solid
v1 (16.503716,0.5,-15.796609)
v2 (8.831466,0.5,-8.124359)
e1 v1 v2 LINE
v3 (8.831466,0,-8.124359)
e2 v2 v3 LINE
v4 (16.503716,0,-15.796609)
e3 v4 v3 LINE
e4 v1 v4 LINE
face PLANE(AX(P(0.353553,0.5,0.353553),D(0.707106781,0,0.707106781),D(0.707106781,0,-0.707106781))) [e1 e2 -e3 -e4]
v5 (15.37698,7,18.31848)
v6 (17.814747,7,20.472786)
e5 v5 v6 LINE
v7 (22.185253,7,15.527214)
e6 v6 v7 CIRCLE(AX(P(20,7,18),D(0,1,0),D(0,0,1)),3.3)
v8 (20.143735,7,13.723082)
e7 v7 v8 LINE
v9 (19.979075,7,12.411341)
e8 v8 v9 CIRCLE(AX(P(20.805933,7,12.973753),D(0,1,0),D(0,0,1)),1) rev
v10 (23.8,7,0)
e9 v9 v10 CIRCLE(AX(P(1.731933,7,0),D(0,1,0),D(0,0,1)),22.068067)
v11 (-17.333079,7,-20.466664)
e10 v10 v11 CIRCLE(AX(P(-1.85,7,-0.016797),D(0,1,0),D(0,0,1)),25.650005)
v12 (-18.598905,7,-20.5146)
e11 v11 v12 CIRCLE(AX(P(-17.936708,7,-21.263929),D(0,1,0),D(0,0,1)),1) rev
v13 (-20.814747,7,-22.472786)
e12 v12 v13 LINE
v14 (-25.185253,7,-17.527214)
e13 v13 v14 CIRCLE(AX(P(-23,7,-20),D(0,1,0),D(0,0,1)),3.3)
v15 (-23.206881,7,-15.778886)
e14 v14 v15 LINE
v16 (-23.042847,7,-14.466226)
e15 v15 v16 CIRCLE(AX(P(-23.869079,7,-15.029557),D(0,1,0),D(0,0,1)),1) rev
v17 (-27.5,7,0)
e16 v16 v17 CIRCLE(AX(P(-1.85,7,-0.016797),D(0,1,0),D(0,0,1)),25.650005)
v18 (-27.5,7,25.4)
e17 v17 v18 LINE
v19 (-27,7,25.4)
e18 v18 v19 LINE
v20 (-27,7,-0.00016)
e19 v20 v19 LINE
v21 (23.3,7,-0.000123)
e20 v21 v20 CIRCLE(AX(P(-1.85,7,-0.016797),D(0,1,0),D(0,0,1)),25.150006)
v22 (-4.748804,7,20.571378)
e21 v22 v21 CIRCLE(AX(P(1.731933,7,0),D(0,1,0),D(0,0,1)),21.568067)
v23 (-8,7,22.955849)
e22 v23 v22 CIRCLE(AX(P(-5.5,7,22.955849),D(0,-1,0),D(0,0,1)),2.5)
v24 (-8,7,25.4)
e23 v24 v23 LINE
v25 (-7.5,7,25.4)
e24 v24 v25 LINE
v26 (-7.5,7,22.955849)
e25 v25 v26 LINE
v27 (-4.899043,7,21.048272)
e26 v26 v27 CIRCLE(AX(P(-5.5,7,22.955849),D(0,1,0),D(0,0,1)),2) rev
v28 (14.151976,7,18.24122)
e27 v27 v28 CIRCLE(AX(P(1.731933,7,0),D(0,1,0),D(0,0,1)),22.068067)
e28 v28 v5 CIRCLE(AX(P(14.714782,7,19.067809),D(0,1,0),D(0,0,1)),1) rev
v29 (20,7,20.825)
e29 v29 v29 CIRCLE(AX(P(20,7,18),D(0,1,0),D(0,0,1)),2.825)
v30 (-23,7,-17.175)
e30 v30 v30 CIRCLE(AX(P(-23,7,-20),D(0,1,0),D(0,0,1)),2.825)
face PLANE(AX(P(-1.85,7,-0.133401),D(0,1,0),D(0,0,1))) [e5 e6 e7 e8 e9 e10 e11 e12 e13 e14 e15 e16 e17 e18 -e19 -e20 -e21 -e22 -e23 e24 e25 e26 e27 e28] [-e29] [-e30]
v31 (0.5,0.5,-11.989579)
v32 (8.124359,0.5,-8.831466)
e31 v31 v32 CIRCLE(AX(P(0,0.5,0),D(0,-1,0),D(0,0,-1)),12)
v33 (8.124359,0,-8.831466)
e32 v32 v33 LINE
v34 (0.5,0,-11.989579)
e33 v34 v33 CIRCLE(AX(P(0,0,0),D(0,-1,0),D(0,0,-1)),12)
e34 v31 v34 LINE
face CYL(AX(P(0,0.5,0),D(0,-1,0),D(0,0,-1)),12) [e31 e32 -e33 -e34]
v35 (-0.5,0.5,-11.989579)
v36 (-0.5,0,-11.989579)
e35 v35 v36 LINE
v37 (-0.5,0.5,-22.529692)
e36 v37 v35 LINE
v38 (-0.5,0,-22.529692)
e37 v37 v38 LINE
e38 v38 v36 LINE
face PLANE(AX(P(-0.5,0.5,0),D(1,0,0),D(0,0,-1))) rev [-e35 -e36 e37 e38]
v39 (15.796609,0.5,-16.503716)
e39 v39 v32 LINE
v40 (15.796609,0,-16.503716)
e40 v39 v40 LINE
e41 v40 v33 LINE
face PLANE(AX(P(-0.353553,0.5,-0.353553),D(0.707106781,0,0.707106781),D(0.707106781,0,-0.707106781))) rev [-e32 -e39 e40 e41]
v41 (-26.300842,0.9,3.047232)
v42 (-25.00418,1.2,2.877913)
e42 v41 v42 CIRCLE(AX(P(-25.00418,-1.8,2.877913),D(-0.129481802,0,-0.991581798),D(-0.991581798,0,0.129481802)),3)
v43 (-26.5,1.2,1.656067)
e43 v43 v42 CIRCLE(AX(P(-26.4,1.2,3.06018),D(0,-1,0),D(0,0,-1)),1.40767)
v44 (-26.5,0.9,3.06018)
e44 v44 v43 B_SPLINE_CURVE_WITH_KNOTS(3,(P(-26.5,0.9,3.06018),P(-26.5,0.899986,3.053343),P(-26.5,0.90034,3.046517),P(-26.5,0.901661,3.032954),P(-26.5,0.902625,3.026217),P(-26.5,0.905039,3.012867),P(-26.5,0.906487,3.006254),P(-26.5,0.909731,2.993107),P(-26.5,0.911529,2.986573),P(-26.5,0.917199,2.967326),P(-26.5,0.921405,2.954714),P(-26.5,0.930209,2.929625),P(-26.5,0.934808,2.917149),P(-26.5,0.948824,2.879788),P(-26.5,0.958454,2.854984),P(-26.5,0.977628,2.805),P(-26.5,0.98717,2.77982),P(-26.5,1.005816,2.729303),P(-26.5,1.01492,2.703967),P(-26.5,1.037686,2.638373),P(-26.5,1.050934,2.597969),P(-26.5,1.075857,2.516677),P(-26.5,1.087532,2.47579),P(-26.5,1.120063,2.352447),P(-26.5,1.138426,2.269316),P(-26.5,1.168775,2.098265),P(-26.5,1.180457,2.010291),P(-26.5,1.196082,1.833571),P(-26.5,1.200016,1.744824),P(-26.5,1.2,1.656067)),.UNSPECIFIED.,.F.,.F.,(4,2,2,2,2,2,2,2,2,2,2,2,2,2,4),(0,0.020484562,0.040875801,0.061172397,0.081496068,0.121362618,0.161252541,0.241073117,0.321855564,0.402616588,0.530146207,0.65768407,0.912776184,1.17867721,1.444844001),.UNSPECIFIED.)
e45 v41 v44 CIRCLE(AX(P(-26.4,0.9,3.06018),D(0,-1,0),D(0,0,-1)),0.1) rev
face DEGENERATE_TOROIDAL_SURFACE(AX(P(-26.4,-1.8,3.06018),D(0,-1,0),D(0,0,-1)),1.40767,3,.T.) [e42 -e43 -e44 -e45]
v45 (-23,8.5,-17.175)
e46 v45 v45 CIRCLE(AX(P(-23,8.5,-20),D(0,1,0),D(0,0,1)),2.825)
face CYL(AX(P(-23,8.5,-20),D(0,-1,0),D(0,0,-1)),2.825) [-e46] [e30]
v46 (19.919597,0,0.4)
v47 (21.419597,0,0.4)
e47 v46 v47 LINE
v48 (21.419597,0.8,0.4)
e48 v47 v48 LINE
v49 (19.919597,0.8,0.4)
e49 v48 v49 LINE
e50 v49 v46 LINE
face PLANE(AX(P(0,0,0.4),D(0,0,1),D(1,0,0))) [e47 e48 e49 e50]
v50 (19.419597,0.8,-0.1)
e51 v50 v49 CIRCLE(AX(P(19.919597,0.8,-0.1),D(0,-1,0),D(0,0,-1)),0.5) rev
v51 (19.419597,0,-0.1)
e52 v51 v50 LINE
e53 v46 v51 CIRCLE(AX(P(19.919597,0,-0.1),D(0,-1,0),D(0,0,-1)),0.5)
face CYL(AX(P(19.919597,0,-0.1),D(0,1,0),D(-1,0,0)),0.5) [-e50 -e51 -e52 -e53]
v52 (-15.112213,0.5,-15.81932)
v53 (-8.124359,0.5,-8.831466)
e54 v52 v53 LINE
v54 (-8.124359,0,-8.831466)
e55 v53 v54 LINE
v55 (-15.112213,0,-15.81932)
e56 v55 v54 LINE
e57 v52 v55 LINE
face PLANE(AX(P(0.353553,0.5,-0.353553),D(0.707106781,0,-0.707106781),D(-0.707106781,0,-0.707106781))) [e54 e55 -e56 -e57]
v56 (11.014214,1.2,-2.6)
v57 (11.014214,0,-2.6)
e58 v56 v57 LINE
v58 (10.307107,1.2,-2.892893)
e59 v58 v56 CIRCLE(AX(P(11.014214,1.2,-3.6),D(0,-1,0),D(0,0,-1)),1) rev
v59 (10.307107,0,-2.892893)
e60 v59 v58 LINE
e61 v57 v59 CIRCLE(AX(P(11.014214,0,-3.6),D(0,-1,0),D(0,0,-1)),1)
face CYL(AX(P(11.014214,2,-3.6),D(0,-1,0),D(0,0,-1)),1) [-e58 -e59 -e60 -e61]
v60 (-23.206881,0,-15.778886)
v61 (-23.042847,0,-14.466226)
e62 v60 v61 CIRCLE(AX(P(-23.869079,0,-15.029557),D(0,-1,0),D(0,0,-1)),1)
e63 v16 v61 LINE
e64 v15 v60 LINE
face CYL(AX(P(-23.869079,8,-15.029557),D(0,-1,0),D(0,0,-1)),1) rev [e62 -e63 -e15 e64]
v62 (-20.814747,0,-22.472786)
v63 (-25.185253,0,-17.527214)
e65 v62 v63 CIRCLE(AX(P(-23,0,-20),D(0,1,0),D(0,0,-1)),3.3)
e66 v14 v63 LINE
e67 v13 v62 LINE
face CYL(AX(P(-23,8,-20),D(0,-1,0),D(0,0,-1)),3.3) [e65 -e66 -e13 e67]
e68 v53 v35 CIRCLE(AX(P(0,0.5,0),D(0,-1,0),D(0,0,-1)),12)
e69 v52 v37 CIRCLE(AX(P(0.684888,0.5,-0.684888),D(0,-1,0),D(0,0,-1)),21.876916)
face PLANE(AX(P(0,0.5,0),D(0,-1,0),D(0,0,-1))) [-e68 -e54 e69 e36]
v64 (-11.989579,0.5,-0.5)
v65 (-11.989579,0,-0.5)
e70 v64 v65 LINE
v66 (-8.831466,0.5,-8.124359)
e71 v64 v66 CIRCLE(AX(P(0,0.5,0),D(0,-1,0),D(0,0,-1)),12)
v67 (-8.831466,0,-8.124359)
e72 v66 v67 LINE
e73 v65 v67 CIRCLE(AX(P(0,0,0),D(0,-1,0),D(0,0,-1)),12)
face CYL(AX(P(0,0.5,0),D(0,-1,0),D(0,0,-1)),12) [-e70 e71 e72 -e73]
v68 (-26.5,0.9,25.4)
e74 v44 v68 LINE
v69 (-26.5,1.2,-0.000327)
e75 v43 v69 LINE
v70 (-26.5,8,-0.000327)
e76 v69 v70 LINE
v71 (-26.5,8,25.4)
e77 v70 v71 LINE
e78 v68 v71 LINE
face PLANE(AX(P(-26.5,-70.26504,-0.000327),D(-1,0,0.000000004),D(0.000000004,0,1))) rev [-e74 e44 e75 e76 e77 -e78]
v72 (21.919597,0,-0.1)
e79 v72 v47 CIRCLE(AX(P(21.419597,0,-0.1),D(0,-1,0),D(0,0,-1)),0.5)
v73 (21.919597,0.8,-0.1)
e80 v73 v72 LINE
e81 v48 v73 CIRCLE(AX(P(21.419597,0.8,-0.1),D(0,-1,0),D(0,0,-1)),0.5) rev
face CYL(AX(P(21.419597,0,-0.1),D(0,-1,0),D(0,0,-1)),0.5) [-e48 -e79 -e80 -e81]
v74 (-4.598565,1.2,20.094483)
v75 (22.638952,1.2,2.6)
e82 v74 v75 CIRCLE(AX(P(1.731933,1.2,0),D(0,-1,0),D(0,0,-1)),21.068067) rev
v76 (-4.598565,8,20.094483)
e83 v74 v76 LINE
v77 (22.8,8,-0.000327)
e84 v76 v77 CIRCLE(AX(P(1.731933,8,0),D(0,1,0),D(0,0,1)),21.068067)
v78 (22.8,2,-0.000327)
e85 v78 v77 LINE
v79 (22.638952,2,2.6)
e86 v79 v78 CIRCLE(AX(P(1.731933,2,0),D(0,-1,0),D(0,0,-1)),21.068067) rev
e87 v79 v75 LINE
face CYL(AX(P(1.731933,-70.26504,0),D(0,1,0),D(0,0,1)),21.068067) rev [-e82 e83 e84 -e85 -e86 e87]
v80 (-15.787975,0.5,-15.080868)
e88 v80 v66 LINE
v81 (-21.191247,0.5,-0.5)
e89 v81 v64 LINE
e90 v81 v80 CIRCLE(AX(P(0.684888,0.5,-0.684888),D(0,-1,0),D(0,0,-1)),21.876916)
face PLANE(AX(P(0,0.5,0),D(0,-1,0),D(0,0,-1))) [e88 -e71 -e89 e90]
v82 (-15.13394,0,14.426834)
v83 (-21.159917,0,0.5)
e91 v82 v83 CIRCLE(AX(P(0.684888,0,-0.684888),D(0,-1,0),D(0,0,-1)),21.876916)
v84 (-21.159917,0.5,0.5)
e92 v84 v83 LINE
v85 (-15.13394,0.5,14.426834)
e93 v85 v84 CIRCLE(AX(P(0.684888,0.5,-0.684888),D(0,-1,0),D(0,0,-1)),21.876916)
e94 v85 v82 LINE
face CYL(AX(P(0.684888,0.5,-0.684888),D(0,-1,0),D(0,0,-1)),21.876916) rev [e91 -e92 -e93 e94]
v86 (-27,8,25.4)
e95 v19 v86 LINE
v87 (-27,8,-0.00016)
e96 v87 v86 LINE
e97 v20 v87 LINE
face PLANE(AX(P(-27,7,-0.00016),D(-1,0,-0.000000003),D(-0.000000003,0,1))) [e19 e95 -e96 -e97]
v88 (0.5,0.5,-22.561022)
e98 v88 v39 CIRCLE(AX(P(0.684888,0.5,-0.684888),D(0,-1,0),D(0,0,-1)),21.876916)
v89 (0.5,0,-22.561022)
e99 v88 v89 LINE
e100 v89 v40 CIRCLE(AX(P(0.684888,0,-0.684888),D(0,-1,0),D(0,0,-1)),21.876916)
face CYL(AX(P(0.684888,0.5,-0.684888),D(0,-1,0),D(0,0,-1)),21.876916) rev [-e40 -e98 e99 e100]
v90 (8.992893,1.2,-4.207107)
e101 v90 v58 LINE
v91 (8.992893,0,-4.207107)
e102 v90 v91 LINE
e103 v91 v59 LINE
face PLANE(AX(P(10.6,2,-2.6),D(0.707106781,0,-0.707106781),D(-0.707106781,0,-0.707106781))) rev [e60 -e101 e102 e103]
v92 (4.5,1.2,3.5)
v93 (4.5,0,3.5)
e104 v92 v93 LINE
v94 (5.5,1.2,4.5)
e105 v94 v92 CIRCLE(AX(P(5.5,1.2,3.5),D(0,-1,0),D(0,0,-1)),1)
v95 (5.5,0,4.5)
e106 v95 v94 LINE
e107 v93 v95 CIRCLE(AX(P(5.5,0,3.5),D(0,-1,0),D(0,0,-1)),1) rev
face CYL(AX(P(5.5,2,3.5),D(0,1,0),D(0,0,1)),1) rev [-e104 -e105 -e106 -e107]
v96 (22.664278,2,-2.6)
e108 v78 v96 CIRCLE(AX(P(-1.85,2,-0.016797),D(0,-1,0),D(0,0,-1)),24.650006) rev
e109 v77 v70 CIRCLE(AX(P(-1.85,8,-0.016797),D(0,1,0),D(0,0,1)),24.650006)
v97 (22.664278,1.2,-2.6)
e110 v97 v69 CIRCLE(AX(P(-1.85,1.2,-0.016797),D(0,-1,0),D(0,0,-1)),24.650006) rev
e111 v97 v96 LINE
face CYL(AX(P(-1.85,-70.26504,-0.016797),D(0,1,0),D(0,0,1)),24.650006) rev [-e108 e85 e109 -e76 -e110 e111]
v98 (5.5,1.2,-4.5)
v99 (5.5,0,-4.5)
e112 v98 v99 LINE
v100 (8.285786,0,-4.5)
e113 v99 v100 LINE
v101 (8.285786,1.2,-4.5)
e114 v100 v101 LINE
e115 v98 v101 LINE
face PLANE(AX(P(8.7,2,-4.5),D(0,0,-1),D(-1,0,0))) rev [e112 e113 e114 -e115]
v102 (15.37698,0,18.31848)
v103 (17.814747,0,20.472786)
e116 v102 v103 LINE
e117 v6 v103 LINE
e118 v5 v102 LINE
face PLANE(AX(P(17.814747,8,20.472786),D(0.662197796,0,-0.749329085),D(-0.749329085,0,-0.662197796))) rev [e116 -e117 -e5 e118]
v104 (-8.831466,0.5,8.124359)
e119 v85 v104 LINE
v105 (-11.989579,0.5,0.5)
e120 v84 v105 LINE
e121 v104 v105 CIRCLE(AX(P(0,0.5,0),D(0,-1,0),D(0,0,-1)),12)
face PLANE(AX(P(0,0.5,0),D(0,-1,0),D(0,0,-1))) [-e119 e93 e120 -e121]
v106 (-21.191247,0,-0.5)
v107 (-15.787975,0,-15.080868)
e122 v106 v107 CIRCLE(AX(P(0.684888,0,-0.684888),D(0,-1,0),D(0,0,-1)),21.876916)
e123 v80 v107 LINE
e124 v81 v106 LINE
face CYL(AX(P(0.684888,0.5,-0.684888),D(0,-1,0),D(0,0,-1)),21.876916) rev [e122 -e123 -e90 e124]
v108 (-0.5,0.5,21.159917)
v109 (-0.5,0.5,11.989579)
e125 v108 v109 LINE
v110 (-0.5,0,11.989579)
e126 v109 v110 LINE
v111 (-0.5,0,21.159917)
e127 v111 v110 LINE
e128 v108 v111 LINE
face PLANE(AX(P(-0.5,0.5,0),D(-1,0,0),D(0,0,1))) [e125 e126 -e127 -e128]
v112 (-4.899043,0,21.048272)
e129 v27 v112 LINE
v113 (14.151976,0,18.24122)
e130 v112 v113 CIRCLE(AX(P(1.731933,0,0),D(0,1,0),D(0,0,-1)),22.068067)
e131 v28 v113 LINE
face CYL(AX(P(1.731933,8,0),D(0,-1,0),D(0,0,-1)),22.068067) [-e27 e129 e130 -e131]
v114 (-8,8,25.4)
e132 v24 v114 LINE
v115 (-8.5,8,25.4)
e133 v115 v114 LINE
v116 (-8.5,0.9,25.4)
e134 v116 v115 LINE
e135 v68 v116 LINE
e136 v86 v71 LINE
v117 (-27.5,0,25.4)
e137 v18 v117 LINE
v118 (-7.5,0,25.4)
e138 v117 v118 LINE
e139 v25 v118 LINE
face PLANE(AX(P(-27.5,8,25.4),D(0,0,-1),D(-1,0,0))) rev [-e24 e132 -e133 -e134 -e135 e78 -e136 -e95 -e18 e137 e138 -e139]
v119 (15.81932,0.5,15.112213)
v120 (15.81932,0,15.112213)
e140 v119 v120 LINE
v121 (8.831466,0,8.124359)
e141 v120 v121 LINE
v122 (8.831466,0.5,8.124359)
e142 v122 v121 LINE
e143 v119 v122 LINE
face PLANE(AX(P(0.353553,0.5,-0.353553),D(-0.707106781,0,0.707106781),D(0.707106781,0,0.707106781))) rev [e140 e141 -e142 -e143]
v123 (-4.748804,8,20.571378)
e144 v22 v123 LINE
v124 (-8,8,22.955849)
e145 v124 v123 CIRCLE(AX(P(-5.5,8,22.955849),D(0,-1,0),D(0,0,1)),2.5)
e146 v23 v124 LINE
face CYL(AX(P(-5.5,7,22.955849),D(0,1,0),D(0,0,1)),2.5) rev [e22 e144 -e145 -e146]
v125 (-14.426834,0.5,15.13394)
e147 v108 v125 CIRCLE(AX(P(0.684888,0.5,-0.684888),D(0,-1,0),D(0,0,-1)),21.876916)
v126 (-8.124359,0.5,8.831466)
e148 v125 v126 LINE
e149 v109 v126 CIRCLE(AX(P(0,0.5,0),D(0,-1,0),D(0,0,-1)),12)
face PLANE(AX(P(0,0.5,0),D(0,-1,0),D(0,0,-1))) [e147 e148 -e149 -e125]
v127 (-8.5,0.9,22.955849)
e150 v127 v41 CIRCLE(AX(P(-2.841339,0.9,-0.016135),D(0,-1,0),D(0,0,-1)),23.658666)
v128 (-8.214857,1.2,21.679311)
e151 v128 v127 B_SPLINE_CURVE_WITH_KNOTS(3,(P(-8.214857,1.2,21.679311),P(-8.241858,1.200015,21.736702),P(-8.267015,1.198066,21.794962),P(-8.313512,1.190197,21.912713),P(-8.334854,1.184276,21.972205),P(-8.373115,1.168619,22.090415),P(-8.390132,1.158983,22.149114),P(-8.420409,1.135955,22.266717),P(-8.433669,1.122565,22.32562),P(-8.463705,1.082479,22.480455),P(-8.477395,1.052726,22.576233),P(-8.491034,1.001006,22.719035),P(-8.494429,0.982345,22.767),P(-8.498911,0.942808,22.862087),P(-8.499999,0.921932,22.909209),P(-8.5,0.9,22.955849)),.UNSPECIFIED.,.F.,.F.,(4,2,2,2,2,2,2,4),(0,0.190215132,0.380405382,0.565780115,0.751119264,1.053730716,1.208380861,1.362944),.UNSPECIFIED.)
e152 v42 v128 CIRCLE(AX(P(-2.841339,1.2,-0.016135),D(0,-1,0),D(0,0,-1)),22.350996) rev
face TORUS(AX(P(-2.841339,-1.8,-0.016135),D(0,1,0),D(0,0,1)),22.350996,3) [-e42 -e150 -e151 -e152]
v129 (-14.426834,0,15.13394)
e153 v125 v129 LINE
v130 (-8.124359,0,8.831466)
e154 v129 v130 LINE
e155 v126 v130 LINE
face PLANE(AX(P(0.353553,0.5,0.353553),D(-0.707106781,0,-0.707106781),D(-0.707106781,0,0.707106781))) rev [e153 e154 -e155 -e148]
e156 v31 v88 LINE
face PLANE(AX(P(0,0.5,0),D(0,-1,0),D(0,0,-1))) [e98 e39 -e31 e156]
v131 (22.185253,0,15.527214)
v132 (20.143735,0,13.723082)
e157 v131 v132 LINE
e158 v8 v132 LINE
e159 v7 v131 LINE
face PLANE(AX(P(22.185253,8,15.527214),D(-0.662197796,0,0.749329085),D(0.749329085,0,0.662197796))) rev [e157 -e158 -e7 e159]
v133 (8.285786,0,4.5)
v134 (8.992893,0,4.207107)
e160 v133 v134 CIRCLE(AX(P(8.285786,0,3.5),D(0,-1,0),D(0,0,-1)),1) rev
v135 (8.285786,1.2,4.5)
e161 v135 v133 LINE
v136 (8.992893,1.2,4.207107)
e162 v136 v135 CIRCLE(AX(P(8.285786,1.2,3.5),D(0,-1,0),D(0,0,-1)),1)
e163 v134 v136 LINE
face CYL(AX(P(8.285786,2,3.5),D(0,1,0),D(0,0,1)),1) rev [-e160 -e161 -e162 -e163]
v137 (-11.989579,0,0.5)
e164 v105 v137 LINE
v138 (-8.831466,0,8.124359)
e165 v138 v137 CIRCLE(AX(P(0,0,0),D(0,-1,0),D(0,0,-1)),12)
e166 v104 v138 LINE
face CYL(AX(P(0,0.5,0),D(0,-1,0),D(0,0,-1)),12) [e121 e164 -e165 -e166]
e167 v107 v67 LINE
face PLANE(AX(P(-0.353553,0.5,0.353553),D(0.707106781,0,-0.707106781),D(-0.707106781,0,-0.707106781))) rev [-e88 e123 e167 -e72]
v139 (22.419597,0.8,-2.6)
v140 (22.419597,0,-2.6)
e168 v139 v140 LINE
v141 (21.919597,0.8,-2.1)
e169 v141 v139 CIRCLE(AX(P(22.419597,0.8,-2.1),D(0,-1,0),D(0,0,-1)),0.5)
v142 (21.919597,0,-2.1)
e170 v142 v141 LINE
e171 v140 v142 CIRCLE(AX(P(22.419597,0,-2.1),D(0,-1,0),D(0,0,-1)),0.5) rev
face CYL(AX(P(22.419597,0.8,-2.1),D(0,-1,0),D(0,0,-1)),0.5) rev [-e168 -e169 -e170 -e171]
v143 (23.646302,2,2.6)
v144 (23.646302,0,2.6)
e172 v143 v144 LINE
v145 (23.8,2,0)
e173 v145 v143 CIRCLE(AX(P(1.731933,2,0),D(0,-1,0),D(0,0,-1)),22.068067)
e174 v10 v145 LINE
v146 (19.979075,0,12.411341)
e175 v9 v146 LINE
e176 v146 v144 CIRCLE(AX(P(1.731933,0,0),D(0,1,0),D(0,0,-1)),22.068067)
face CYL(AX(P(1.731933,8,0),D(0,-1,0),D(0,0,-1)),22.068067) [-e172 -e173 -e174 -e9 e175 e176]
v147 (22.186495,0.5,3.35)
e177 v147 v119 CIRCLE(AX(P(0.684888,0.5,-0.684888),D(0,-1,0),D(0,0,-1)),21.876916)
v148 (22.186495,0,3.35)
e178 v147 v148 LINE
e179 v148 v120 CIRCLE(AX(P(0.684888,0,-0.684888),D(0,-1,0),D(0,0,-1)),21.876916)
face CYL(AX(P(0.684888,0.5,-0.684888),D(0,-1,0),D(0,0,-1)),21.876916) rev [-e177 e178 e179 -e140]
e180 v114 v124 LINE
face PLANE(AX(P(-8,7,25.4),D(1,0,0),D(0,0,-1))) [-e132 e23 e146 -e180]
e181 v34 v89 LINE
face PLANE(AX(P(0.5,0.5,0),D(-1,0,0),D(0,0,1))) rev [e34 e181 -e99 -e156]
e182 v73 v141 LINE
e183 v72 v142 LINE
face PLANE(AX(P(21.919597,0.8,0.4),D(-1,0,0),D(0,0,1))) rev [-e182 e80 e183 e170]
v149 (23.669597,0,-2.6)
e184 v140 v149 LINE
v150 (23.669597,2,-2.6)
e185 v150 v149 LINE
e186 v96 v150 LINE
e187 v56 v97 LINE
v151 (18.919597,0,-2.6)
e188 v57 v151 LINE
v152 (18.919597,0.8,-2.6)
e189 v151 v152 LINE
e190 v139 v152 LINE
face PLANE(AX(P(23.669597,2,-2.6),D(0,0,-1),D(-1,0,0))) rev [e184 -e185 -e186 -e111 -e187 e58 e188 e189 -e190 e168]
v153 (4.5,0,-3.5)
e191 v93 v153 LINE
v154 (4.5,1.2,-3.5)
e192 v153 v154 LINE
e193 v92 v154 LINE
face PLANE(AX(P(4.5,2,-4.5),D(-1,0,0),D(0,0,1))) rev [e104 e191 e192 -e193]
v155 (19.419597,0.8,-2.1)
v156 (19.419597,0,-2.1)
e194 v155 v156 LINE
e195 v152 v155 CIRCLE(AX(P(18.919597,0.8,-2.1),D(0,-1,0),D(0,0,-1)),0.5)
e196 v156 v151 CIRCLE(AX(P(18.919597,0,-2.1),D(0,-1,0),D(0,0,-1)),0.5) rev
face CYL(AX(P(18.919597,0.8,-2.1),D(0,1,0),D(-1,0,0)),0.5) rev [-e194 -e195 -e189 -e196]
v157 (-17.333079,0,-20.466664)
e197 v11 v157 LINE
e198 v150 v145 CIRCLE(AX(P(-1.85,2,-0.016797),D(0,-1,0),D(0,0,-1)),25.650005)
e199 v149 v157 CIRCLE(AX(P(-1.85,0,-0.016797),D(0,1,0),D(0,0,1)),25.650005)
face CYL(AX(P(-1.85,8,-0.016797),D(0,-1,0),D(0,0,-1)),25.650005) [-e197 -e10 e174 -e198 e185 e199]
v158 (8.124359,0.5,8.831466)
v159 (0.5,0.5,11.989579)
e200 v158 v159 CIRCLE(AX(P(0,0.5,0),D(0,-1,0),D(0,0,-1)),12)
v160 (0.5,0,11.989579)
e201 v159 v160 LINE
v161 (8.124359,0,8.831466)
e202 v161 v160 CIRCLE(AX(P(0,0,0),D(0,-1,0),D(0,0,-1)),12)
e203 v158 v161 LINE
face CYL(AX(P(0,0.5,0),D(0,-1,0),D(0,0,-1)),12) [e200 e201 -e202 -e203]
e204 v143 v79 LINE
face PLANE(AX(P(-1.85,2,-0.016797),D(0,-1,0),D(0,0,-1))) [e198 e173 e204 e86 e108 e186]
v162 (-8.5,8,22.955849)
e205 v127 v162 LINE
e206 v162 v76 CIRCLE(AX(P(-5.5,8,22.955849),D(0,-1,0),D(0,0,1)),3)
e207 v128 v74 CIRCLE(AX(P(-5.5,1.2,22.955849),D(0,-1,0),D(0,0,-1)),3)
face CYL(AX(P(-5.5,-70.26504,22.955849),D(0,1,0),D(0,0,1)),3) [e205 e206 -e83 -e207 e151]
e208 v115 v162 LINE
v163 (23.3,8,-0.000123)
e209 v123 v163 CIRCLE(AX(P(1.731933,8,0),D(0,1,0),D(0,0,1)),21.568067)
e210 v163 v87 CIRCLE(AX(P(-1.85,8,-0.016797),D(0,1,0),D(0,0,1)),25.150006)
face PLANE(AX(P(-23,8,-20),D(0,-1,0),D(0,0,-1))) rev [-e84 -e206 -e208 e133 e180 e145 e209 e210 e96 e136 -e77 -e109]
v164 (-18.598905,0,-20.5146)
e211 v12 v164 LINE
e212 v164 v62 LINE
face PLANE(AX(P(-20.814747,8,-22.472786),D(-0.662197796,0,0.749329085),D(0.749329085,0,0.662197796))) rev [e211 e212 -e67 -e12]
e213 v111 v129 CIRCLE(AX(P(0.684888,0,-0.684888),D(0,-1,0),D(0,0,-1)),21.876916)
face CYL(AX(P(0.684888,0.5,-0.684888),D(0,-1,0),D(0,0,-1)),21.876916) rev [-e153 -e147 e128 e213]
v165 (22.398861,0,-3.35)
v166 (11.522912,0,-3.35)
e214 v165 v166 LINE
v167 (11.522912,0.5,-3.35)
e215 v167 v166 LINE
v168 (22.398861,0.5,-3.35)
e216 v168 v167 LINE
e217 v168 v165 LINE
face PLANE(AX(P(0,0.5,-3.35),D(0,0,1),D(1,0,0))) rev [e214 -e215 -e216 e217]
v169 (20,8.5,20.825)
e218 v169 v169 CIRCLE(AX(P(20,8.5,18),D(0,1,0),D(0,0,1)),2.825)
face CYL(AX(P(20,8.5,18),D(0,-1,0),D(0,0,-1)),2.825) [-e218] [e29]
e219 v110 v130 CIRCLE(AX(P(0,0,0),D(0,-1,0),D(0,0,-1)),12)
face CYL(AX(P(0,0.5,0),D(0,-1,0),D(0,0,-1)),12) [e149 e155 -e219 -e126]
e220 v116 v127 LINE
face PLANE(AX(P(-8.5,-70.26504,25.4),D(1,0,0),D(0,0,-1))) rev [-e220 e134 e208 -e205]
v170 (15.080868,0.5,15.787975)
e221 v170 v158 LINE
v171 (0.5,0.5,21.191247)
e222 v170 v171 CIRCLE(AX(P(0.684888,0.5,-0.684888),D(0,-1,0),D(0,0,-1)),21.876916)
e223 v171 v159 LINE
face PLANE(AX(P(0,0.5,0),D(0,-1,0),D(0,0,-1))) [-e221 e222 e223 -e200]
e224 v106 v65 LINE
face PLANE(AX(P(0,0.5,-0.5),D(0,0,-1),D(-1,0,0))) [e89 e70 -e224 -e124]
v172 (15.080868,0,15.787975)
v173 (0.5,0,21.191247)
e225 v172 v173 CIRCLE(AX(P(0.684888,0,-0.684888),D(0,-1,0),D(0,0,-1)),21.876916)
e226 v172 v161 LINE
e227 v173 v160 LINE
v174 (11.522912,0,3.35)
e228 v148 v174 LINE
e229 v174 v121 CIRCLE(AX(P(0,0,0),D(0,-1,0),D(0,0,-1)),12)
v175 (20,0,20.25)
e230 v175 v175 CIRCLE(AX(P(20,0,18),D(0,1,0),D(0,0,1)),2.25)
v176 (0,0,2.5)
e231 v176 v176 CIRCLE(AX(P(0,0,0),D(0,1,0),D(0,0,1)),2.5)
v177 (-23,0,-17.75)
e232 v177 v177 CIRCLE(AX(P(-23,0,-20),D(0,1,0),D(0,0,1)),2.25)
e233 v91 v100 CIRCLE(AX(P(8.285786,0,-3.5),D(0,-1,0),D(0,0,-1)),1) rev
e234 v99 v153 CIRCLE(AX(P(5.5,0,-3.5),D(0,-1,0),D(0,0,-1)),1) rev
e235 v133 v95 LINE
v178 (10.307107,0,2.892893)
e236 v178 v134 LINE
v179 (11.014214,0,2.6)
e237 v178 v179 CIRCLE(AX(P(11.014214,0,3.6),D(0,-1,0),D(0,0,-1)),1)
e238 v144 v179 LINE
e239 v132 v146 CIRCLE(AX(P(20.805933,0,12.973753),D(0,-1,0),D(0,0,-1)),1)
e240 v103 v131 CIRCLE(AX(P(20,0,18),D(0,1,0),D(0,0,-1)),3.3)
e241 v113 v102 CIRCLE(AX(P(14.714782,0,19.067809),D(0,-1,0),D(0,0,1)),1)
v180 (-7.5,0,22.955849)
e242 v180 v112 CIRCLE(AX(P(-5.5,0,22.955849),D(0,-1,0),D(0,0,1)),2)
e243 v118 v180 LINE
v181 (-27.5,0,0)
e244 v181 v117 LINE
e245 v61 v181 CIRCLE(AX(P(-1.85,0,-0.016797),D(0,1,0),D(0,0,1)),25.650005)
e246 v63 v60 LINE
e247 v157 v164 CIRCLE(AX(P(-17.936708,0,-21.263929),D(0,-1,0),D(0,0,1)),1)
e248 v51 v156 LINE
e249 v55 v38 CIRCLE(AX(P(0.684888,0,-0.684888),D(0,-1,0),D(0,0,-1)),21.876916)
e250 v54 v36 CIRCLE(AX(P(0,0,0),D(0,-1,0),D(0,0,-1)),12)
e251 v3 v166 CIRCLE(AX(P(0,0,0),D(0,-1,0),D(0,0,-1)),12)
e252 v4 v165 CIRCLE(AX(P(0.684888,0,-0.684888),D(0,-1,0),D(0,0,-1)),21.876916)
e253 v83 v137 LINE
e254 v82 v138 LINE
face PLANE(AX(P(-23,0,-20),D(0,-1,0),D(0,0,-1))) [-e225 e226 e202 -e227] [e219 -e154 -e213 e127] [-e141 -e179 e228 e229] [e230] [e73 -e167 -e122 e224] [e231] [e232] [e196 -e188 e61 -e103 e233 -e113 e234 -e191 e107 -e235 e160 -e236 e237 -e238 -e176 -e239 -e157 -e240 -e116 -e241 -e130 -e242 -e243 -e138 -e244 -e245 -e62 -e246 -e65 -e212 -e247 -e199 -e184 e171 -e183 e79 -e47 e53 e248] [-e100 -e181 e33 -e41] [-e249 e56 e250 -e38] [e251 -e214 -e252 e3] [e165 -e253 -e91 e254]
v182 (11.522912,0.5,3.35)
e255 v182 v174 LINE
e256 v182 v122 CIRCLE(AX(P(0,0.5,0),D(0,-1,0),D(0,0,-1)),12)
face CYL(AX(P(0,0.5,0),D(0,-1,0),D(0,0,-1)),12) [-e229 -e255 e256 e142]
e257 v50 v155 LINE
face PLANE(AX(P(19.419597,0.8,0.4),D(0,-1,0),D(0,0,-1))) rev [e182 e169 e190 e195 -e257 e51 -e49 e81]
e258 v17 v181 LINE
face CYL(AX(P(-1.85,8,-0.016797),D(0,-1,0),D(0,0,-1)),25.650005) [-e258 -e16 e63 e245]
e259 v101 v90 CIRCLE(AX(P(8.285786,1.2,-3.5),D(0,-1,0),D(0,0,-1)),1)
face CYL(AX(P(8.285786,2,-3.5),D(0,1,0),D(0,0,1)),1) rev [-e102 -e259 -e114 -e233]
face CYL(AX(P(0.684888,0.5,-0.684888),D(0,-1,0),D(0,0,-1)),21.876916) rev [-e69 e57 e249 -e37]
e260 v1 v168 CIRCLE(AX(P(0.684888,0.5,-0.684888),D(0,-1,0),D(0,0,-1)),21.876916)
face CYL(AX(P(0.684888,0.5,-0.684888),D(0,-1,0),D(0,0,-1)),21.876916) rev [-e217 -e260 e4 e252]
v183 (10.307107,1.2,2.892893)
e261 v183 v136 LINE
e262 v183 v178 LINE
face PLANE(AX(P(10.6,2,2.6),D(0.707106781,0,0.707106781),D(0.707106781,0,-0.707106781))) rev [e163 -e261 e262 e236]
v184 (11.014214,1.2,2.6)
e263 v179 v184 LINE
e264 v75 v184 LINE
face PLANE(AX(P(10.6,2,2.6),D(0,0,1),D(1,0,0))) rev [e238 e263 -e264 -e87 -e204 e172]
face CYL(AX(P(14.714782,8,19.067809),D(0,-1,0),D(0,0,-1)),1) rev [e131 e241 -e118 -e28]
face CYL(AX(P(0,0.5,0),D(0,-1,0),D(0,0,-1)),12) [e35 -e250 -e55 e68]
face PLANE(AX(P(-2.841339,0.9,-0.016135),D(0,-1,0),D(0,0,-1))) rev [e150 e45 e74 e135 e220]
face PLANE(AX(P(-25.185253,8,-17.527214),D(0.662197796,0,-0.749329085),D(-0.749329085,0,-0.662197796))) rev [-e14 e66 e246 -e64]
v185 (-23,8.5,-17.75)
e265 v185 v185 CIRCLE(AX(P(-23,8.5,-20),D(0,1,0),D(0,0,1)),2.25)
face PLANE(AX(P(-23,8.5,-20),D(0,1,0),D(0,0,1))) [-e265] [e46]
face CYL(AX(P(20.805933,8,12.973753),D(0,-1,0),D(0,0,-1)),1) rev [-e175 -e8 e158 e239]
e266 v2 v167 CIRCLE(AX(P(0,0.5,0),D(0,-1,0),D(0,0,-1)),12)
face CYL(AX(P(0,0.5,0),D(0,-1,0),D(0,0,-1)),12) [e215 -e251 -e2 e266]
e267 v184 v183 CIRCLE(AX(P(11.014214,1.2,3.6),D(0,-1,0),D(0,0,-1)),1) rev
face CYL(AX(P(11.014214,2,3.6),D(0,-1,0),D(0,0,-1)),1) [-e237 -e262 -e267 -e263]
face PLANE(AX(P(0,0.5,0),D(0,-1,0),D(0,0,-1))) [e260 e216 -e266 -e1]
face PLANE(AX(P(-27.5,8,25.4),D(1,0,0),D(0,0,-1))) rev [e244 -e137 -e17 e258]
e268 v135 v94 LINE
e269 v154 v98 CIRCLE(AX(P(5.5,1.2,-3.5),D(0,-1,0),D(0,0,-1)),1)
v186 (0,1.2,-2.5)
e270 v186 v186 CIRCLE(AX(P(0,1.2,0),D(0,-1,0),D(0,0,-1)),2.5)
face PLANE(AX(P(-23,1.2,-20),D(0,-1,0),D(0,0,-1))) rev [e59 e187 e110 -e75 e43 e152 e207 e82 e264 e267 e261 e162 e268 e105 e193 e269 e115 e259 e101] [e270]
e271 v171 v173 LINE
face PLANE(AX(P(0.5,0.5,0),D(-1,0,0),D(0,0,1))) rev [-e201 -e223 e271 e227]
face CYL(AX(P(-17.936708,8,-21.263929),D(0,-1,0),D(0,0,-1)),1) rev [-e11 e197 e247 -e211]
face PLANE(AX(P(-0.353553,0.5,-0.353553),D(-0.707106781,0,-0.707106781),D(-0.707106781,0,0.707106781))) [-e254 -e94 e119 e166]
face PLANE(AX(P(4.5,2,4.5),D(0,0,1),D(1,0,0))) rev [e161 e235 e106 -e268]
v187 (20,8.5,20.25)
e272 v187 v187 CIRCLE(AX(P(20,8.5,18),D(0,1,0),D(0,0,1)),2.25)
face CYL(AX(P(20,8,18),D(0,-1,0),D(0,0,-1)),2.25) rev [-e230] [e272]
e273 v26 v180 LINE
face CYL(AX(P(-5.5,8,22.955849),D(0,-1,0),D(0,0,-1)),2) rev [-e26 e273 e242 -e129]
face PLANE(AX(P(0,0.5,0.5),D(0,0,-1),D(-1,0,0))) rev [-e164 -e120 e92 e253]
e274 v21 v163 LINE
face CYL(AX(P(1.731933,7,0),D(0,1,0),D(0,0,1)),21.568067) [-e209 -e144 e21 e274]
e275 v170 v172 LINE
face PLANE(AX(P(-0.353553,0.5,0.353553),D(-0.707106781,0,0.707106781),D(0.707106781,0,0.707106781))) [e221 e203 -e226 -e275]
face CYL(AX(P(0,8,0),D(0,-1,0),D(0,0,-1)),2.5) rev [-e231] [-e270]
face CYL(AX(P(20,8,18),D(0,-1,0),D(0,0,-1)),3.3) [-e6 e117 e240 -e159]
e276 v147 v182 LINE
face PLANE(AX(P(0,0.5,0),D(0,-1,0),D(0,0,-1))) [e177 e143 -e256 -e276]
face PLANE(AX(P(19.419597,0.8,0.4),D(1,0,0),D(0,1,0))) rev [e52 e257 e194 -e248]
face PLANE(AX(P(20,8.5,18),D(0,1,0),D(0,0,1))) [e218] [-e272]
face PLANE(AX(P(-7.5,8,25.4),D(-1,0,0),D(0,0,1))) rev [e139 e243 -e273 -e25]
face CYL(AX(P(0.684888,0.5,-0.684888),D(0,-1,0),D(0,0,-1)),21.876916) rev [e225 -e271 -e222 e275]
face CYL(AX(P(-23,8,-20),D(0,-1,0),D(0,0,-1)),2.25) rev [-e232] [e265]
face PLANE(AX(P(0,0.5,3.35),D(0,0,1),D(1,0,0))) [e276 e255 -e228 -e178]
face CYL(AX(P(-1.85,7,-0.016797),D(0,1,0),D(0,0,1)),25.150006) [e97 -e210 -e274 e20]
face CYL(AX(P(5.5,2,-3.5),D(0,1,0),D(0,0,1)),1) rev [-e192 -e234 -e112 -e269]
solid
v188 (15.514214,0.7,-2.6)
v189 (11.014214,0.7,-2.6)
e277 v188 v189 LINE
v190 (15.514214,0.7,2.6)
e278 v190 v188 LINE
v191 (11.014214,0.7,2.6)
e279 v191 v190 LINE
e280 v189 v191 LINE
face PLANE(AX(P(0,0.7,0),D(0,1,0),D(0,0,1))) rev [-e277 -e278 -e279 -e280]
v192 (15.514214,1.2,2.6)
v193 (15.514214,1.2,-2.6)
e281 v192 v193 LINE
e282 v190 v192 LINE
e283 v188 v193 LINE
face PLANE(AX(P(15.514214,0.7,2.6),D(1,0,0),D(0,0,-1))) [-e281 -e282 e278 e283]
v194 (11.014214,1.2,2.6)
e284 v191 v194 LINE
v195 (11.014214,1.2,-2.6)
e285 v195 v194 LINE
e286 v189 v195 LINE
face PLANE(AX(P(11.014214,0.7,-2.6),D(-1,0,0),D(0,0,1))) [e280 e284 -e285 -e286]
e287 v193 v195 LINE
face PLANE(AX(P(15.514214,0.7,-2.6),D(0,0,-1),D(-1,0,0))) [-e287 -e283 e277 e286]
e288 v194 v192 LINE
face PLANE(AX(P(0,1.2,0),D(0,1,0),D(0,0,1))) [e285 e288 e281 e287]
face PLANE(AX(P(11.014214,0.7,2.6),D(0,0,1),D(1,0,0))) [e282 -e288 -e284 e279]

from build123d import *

# Parameters (mm, degrees)
SKETCH_1_R          = 2.25
SKETCH_1_R_2        = 2.5
EXTRUDE_1_DEPTH     = 8
CUT_EXTRUDE_1_DEPTH = 6.8
SKETCH_3_OUTSIDE_W  = 67.866
SKETCH_3_OUTSIDE_H  = 67.633
CUT_EXTRUDE_4_DEPTH = 1
SKETCH_5_R          = 2.825
SKETCH_5_R_2        = 2.25
EXTRUDE_2_DEPTH     = 1.5
CUT_EXTRUDE_5_DEPTH = 0.5
CUT_EXTRUDE_6_DEPTH = 2
FILLET_1_R          = 1
SKETCH_8_W          = 2.5
SKETCH_8_H          = 0.8
EXTRUDE_4_DEPTH     = 3
FILLET_2_R          = 0.5
CUT_EXTRUDE_7_DEPTH = 0.3
FILLET_3_R          = 0.1
FILLET_4_R          = 3
SKETCH_10_W         = 4.5
SKETCH_10_H         = 5.2
EXTRUDE_5_DEPTH     = 0.5


with BuildPart() as part:
    # Эскиз1 → Бобышка-Вытянуть1 (new body)
    with BuildSketch(Plane(origin=(0, 0, 0), x_dir=(1, 0, 0), z_dir=(0, 1, 0))):
        with BuildLine():
            Line((-27.5, -25.4), (-7.5, -25.4))
            Line((-7.5, -25.4), (-7.5, -22.955849111))
            ThreePointArc((-7.5, -22.955849111), (-6.68281162, -21.343100938), (-4.899043329, -21.048271831))
            ThreePointArc((-4.899043329, -21.048271831), (4.948796089, -21.832347138), (14.151976117, -18.241220202))
            ThreePointArc((14.151976117, -18.241220202), (14.777726241, -18.069792078), (15.376980036, -18.318480053))
            Line((15.376980036, -18.318480053), (17.814747272, -20.472785982))
            ThreePointArc((17.814747272, -20.472785982), (22.472785982, -20.185252728), (22.185252728, -15.527214018))
            Line((22.185252728, -15.527214018), (20.143734708, -13.723081814))
            ThreePointArc((20.143734708, -13.723081814), (19.813719174, -13.098302749), (19.979075206, -12.411340949))
            ThreePointArc((19.979075206, -12.411340949), (22.823148445, -6.493089604), (23.8, 0))
            ThreePointArc((23.8, 0), (9.576401492, 22.98111988), (-17.333078903, 20.466663618))
            ThreePointArc((-17.333078903, 20.466663618), (-17.974550182, 20.264645495), (-18.598905377, 20.514600122))
            Line((-18.598905377, 20.514600122), (-20.814747272, 22.472785982))
            ThreePointArc((-20.814747272, 22.472785982), (-25.472785982, 22.185252728), (-25.185252728, 17.527214018))
            Line((-25.185252728, 17.527214018), (-23.20688118, 15.778885673))
            ThreePointArc((-23.20688118, 15.778885673), (-22.876796583, 15.153555184), (-23.04284729, 14.466226133))
            ThreePointArc((-23.04284729, 14.466226133), (-26.362874376, 7.569397218), (-27.5, 0))
            Line((-27.5, 0), (-27.5, -25.4))
        make_face()
        with Locations(Location((-23, 20, 0), (0, 0, 270))):
            Circle(SKETCH_1_R, mode=Mode.SUBTRACT)
        with Locations(Location((20, -18, 0), (0, 0, 270))):
            Circle(SKETCH_1_R, mode=Mode.SUBTRACT)
        with Locations(Location((0, 0, 0), (0, 0, 270))):
            Circle(SKETCH_1_R_2, mode=Mode.SUBTRACT)
    extrude(amount=EXTRUDE_1_DEPTH)

    # Эскиз2 → Вырез-Вытянуть1 (cut)
    with BuildSketch(Plane(origin=(0, 8, 0), x_dir=(1, 0, 0), z_dir=(0, 1, 0))):
        with BuildLine():
            Line((-8.5, -25.4), (-8.5, -22.955849111))
            ThreePointArc((-8.5, -22.955849111), (-7.274217431, -20.536726851), (-4.598564994, -20.094483191))
            ThreePointArc((-4.598564994, -20.094483191), (4.803026036, -20.843028639), (13.589169994, -17.414631267))
            ThreePointArc((13.589169994, -17.414631267), (16.632858543, -14.893819788), (19.152217909, -11.84892917))
            ThreePointArc((19.152217909, -11.84892917), (21.867461922, -6.198703298), (22.799999997, 0.000326884))
            ThreePointArc((22.799999997, 0.000326884), (9.131074658, 22.085751778), (-16.729450225, 19.669398029))
            ThreePointArc((-16.729450225, 19.669398029), (-19.707335368, 17.009099388), (-22.216615604, 13.902895678))
            ThreePointArc((-22.216615604, 13.902895678), (-25.407255169, 7.27479247), (-26.500000107, 0.000327424))
            Line((-26.500000107, 0.000327424), (-26.5, -25.4))
            Line((-26.5, -25.4), (-8.5, -25.4))
        make_face()
    extrude(amount=-CUT_EXTRUDE_1_DEPTH, mode=Mode.SUBTRACT)

    # Эскиз3 outside → Вырез-Вытянуть4 (cut)
    with BuildSketch(Plane(origin=(0, 8, 0), x_dir=(1, 0, 0), z_dir=(0, 1, 0))):
        with Locations((-1.85, 0.1335)):
            Rectangle(SKETCH_3_OUTSIDE_W, SKETCH_3_OUTSIDE_H)
        with BuildLine():
            Line((-8, -25.4), (-8, -22.955849111))
            ThreePointArc((-8, -22.955849111), (-6.978514526, -20.939913894), (-4.748804162, -20.571377511))
            ThreePointArc((-4.748804162, -20.571377511), (14.487462515, -17.39189423), (23.3, 0.000122694))
            ThreePointArc((23.3, 0.000122694), (-1.849981151, 25.166802402), (-26.999999983, 0.000160392))
            Line((-26.999999983, 0.000160392), (-27.000000053, -25.4))
            Line((-27.000000053, -25.4), (-8, -25.4))
        make_face(mode=Mode.SUBTRACT)
    extrude(amount=-CUT_EXTRUDE_4_DEPTH, mode=Mode.SUBTRACT)

    # Эскиз5 → Бобышка-Вытянуть2 (add)
    # profile 1 of 2: a face of its own
    with BuildSketch(Plane(origin=(0, 7, 0), x_dir=(1, 0, 0), z_dir=(0, 1, 0))):
        with Locations(Location((20, -18, 0), (0, 0, 270))):
            Circle(SKETCH_5_R)
        with Locations(Location((20, -18, 0), (0, 0, 270))):
            Circle(SKETCH_5_R_2, mode=Mode.SUBTRACT)
    # profile 2 of 2: a face of its own
    with BuildSketch(Plane(origin=(0, 7, 0), x_dir=(1, 0, 0), z_dir=(0, 1, 0))):
        with Locations(Location((-23, 20, 0), (0, 0, 270))):
            Circle(SKETCH_5_R)
        with Locations(Location((-23, 20, 0), (0, 0, 270))):
            Circle(SKETCH_5_R_2, mode=Mode.SUBTRACT)
    extrude(amount=EXTRUDE_2_DEPTH)

    # Эскиз6 → Вырез-Вытянуть5 (cut)
    with BuildSketch(Plane.XZ):
        with BuildLine():
            Line((-8.124359088, -8.831465869), (-12.079320344, -12.786427125))
            Line((-12.079320344, -12.786427125), (-15.112213356, -15.819320137))
            ThreePointArc((-15.112213356, -15.819320137), (-8.444967684, -20.565662067), (-0.5, -22.529692378))
            Line((-0.5, -22.529692378), (-0.5, -18.690864606))
            Line((-0.5, -18.690864606), (-0.5, -11.989578808))
            ThreePointArc((-0.5, -11.989578808), (-4.592201188, -11.08655439), (-8.124359088, -8.831465869))
        make_face()
        with BuildLine():
            Line((-15.787974775, -15.080867994), (-12.786427125, -12.079320344))
            Line((-12.786427125, -12.079320344), (-8.831465869, -8.124359088))
            ThreePointArc((-8.831465869, -8.124359088), (-11.08655439, -4.592201188), (-11.989578808, -0.5))
            Line((-11.989578808, -0.5), (-19.679374583, -0.5))
            Line((-19.679374583, -0.5), (-21.191246789, -0.5))
            ThreePointArc((-21.191246789, -0.5), (-19.828810643, -8.286704941), (-15.787974775, -15.080867994))
        make_face()
        with BuildLine():
            Line((-21.159916823, 0.5), (-19.679374583, 0.5))
            Line((-19.679374583, 0.5), (-11.989578808, 0.5))
            ThreePointArc((-11.989578808, 0.5), (-11.08655439, 4.592201188), (-8.831465869, 8.124359088))
            Line((-8.831465869, 8.124359088), (-11.509243088, 10.802136307))
            Line((-11.509243088, 10.802136307), (-15.133940377, 14.426833596))
            ThreePointArc((-15.133940377, 14.426833596), (-19.393122123, 8.00263002), (-21.159916823, 0.5))
        make_face()
        with BuildLine():
            Line((-14.426833596, 15.133940377), (-10.802136307, 11.509243088))
            Line((-10.802136307, 11.509243088), (-8.124359088, 8.831465869))
            ThreePointArc((-8.124359088, 8.831465869), (-4.592201188, 11.08655439), (-0.5, 11.989578808))
            Line((-0.5, 11.989578808), (-0.5, 17.569097793))
            Line((-0.5, 17.569097793), (-0.5, 21.159916823))
            ThreePointArc((-0.5, 21.159916823), (-8.00263002, 19.393122123), (-14.426833596, 15.133940377))
        make_face()
        with BuildLine():
            Line((0.5, 21.191246789), (0.5, 17.569097793))
            Line((0.5, 17.569097793), (0.5, 11.989578808))
            ThreePointArc((0.5, 11.989578808), (4.592201188, 11.08655439), (8.124359088, 8.831465869))
            Line((8.124359088, 8.831465869), (11.227255938, 11.93436272))
            Line((11.227255938, 11.93436272), (15.080867994, 15.787974775))
            ThreePointArc((15.080867994, 15.787974775), (8.286704941, 19.828810643), (0.5, 21.191246789))
        make_face()
        with BuildLine():
            Line((11.522911958, 3.35), (18.148882908, 3.35))
            Line((18.148882908, 3.35), (22.186495338, 3.35))
            ThreePointArc((22.186495338, 3.35), (19.923839699, 9.729629785), (15.819320137, 15.112213356))
            Line((15.819320137, 15.112213356), (11.93436272, 11.227255938))
            Line((11.93436272, 11.227255938), (8.831465869, 8.124359088))
            ThreePointArc((8.831465869, 8.124359088), (10.453410944, 5.892893995), (11.522911958, 3.35))
        make_face()
        with BuildLine():
            Line((8.831465869, -8.124359088), (10.382914295, -9.675807513))
            Line((10.382914295, -9.675807513), (16.503715933, -15.796609151))
            ThreePointArc((16.503715933, -15.796609151), (20.456263822, -10.049295735), (22.398860789, -3.35))
            Line((22.398860789, -3.35), (18.148882908, -3.35))
            Line((18.148882908, -3.35), (11.522911958, -3.35))
            ThreePointArc((11.522911958, -3.35), (10.453410944, -5.892893995), (8.831465869, -8.124359088))
        make_face()
        with BuildLine():
            Line((0.5, -11.989578808), (0.5, -18.690864606))
            Line((0.5, -18.690864606), (0.5, -22.561022344))
            ThreePointArc((0.5, -22.561022344), (8.739410144, -21.025097131), (15.796609151, -16.503715933))
            Line((15.796609151, -16.503715933), (9.675807513, -10.382914295))
            Line((9.675807513, -10.382914295), (8.124359088, -8.831465869))
            ThreePointArc((8.124359088, -8.831465869), (4.592201188, -11.08655439), (0.5, -11.989578808))
        make_face()
    extrude(amount=-CUT_EXTRUDE_5_DEPTH, mode=Mode.SUBTRACT)

    # Эскиз7 → Вырез-Вытянуть6 (cut)
    with BuildSketch(Plane.XZ):
        with BuildLine():
            Line((23.669597249, -2.6), (10.6, -2.6))
            Line((10.6, -2.6), (8.7, -4.5))
            Line((8.7, -4.5), (4.5, -4.5))
            Line((4.5, -4.5), (4.5, 4.5))
            Line((4.5, 4.5), (8.7, 4.5))
            Line((8.7, 4.5), (10.6, 2.6))
            Line((10.6, 2.6), (23.646302286, 2.6))
            ThreePointArc((23.646302286, 2.6), (23.761542061, 1.30226946), (23.8, 0))
            ThreePointArc((23.8, 0), (23.767804759, -1.30165542), (23.669597249, -2.6))
        make_face()
    extrude(amount=-CUT_EXTRUDE_6_DEPTH, mode=Mode.SUBTRACT)

    # Скругление1
    fillet_1_edges = [part.edges().sort_by_distance(p)[0] for p in [
        (10.6, 0.6, -2.6),
        (8.7, 0.6, -4.5),
        (4.5, 0.6, -4.5),
        (4.5, 0.6, 4.5),
        (8.7, 0.6, 4.5),
        (10.6, 0.6, 2.6),
    ]]
    fillet(fillet_1_edges, radius=FILLET_1_R)

    # Эскиз8 → Бобышка-Вытянуть4 (add)
    with BuildSketch(Plane.XY.offset(-2.6)):
        with Locations((20.669597249, 0.4)):
            Rectangle(SKETCH_8_W, SKETCH_8_H)
    extrude(amount=EXTRUDE_4_DEPTH)

    # Скругление2
    fillet_2_edges = [part.edges().sort_by_distance(p)[0] for p in [
        (21.919597249, 0.4, -2.6),
        (19.419597249, 0.4, -2.6),
        (21.919597249, 0.4, 0.4),
        (19.419597249, 0.4, 0.4),
    ]]
    fillet(fillet_2_edges, radius=FILLET_2_R)

    # Эскиз9 → Вырез-Вытянуть7 (cut)
    with BuildSketch(Plane(origin=(0, 1.2, 0), x_dir=(1, 0, 0), z_dir=(0, 1, 0))):
        with BuildLine():
            Line((-8.5, -22.955849111), (-8.5, -25.4))
            Line((-8.5, -25.4), (-26.500000053, -25.4))
            Line((-26.500000053, -25.4), (-26.500000053, 0.000327424))
            ThreePointArc((-26.500000053, 0.000327424), (-21.459149206, -14.582140414), (-8.5, -22.955849111))
        make_face()
    extrude(amount=-CUT_EXTRUDE_7_DEPTH, mode=Mode.SUBTRACT)

    # Скругление3
    fillet_3_edges = [part.edges().sort_by_distance(p)[0] for p in [
        (-26.500000053, 1.05, -0.000327424),
    ]]
    fillet(fillet_3_edges, radius=FILLET_3_R)

    # Скругление4
    # the kernel refuses this fillet: 3 mm, written as the material it takes off along each edge
    with BuildSketch(Plane(origin=(-26.400000053, 1.2, 3.060180663), x_dir=(0.9923757765688515, 0, -0.12324900843158587), z_dir=(-0.12324900843158587, 0, -0.9923757765688515))) as fillet_4_piece_1_section:
        with BuildLine():
            CenterArc((-1.407669683, 3), FILLET_4_R, 270, 25.841932763)
            Line((-0.1, 0.3), (-0.1, 0))
            Line((-0.1, 0), (-1.407669683, 0))
        make_face()
    fillet_4_piece_1 = revolve(axis=Axis((-26.400000053, 1.2, 3.060180663), (0, -1, 0)), revolution_arc=359.64, mode=Mode.PRIVATE)
    fillet_4_piece_1 = split(fillet_4_piece_1, bisect_by=Plane(origin=(-26.500000097, 1.12988638, 2.326222559), z_dir=(1.0, 0, -4.220683577170919e-09)), keep=Keep.TOP, mode=Mode.PRIVATE)
    add(fillet_4_piece_1, mode=Mode.SUBTRACT)
    with BuildSketch(Plane(origin=(-2.841339444, 1.2, -0.01613453), x_dir=(-0.9915817966570438, 0, 0.12948181547379184), z_dir=(-0.12948181547379184, 0, -0.9915817966570438))) as fillet_4_piece_2_section:
        with BuildLine():
            CenterArc((22.350996206, -3), FILLET_4_R, 64.158067237, 25.841932763)
            Line((23.658665889, -0.3), (23.658665889, 0))
            Line((23.658665889, 0), (22.350996206, 0))
        make_face()
    fillet_4_piece_2 = revolve(axis=Axis((-2.841339444, 1.2, -0.01613453), (0, 1, 0)), revolution_arc=76.641282735, mode=Mode.PRIVATE)
    fillet_4_piece_2 = fillet_4_piece_2 - Plane(origin=(-5.5, 1.12988638, 22.955849111), x_dir=(-1, 0, 0), z_dir=(0, 1, 0)) * Cylinder(3, 95, mode=Mode.PRIVATE)
    add(fillet_4_piece_2, mode=Mode.SUBTRACT)


with BuildPart() as body_2:
    # Эскиз10 → Бобышка-Вытянуть5 (new body)
    with BuildSketch(Plane(origin=(0, 1.2, 0), x_dir=(1, 0, 0), z_dir=(0, 1, 0))):
        with Locations((13.264213562, 0)):
            Rectangle(SKETCH_10_W, SKETCH_10_H)
    extrude(amount=-EXTRUDE_5_DEPTH)


solid = Compound([part.part, body_2.part])
